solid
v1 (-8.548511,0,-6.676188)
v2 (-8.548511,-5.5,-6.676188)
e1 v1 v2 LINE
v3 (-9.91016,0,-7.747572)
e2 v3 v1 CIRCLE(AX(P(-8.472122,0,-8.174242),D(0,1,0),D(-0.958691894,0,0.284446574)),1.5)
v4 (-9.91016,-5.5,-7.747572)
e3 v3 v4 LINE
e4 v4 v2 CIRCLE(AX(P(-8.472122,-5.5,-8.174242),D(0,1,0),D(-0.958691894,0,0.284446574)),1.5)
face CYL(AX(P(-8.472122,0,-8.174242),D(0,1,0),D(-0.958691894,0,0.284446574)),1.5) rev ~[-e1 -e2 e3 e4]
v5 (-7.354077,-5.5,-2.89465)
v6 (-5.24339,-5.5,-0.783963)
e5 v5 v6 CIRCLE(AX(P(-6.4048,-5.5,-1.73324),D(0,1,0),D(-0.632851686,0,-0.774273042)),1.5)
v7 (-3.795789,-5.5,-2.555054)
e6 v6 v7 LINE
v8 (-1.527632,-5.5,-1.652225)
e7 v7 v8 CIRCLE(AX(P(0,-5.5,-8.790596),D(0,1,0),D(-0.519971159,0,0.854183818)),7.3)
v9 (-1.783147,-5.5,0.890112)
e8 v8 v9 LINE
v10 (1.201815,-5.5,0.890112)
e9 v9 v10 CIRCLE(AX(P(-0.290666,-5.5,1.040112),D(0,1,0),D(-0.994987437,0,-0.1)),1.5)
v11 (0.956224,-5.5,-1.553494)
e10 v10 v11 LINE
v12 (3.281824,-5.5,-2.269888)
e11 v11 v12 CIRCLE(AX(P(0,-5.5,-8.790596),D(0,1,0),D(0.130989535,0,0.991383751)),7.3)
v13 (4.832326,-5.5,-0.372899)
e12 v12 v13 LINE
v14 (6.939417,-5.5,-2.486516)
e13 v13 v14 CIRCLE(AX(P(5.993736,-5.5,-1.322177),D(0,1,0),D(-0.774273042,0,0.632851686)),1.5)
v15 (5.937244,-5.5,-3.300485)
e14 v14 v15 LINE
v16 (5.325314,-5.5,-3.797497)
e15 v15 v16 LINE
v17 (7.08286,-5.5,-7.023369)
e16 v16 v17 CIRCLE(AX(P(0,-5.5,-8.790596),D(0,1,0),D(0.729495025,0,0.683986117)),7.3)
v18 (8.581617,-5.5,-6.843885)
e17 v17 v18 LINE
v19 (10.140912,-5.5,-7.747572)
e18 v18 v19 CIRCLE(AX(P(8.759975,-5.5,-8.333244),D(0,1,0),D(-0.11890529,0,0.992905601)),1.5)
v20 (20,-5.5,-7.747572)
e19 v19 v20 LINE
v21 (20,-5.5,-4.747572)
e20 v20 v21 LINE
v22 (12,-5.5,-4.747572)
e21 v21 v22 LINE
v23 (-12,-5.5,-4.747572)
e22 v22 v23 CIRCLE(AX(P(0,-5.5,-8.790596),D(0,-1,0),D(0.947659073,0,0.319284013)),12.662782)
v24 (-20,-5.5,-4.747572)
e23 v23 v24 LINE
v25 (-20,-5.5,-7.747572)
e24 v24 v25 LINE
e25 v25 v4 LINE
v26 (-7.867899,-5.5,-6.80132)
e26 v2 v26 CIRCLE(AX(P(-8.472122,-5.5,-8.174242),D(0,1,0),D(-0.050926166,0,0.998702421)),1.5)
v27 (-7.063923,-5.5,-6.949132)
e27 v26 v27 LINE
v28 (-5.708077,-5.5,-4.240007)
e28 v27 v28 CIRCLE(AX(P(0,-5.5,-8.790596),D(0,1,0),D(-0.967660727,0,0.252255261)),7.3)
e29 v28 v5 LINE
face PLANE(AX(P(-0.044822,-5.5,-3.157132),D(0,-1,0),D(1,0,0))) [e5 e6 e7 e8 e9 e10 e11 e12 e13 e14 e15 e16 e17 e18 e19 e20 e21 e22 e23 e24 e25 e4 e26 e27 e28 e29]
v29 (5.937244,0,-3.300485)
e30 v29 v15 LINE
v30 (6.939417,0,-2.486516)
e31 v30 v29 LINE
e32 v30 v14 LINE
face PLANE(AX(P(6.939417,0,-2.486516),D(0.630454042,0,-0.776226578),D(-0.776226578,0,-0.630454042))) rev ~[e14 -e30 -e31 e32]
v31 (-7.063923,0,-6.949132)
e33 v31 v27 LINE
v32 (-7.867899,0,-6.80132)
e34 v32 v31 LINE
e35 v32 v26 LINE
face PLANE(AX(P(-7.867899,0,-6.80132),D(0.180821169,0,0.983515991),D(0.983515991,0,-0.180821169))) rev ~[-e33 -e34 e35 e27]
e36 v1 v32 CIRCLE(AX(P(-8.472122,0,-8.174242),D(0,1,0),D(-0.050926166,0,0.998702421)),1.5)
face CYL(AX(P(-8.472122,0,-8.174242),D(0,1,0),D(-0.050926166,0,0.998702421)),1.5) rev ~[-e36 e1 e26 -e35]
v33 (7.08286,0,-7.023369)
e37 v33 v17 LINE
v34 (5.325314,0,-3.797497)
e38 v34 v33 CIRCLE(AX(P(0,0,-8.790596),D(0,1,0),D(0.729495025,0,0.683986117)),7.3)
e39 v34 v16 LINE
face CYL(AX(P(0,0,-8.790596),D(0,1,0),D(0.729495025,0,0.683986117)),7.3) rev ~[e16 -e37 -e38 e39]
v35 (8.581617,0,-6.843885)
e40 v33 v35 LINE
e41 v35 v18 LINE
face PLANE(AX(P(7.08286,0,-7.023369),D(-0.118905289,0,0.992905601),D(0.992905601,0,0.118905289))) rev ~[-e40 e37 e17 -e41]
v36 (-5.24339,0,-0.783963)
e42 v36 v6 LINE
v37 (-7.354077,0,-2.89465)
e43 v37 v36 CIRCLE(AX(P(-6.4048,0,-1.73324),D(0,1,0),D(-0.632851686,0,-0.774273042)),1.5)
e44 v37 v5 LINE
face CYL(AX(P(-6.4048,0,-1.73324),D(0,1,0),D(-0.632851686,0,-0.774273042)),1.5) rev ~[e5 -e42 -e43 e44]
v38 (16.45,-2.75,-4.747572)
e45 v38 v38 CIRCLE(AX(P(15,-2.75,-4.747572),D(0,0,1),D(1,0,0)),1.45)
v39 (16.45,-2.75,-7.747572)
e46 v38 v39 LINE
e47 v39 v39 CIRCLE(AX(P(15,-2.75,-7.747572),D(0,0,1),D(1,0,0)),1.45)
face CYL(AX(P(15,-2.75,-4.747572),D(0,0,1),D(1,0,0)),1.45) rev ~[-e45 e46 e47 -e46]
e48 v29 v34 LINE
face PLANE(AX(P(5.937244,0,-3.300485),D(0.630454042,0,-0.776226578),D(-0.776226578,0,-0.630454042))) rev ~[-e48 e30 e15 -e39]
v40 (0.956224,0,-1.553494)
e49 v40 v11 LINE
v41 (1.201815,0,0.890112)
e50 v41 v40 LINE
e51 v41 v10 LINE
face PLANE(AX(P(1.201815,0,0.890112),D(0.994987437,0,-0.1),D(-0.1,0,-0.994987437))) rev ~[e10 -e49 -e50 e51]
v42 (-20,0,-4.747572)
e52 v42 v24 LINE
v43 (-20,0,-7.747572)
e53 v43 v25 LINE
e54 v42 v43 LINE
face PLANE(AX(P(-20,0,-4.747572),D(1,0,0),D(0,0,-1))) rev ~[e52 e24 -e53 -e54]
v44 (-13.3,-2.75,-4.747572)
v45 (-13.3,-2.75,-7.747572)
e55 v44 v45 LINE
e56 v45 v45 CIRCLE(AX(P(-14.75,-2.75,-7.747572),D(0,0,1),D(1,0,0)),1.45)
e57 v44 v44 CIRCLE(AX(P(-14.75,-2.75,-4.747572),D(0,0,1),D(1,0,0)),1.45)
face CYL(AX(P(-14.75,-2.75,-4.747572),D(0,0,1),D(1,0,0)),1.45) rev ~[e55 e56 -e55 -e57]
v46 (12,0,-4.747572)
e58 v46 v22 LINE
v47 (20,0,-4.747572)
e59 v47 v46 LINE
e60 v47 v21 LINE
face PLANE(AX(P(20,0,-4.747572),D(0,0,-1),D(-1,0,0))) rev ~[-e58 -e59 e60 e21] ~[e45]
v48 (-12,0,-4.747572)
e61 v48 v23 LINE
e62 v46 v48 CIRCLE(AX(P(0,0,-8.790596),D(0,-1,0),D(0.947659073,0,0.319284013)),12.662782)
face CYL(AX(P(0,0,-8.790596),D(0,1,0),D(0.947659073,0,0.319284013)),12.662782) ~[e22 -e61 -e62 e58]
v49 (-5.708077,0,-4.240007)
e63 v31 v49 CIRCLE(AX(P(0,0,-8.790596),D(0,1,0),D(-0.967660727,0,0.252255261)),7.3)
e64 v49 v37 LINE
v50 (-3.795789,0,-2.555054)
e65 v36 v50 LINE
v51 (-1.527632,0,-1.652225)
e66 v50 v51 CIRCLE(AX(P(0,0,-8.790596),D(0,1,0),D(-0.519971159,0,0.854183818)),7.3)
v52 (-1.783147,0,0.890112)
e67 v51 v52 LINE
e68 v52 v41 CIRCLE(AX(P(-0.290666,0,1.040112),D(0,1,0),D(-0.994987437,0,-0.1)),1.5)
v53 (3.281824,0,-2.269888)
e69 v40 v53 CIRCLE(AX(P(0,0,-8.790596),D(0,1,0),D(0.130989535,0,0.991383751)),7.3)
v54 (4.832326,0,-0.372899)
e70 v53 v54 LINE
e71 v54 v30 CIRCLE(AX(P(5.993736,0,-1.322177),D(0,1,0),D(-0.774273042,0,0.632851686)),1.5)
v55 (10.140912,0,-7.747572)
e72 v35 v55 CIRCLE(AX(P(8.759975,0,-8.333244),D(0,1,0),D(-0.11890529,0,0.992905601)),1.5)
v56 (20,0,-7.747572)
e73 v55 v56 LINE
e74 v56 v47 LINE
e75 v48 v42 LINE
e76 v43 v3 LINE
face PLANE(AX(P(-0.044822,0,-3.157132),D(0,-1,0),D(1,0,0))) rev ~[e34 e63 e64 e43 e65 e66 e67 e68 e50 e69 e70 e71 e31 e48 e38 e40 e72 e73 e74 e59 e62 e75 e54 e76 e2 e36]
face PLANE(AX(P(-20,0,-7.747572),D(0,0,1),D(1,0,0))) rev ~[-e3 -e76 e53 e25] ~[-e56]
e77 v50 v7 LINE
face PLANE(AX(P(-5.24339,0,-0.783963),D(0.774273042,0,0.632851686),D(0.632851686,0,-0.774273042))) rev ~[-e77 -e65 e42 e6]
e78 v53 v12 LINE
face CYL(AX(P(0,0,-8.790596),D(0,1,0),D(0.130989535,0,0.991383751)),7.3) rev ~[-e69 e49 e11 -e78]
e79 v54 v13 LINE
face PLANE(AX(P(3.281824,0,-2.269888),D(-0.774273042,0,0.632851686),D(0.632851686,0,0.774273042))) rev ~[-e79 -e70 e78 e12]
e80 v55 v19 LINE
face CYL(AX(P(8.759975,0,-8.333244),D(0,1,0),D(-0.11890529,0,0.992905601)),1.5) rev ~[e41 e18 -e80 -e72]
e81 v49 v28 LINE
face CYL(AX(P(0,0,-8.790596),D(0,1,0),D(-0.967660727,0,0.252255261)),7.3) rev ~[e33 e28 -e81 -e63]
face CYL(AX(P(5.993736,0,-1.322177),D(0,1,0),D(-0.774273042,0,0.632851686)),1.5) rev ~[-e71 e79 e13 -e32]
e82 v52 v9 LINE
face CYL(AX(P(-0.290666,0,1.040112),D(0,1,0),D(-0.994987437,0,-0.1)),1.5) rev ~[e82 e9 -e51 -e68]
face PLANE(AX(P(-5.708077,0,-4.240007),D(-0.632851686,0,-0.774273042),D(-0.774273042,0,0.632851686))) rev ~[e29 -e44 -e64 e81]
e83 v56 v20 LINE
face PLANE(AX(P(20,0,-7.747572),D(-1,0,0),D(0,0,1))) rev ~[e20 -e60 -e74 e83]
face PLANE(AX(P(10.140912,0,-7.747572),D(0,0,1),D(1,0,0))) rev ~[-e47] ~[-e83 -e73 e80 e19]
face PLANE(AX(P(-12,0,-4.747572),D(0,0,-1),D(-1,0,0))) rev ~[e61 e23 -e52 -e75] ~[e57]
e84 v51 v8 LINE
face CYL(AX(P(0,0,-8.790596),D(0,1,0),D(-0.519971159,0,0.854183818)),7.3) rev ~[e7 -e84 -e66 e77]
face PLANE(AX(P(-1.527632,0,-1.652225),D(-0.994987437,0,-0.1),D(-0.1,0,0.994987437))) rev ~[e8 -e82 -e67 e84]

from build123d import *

# Parameters (mm, degrees)
F1_DEPTH = 5.5
F2_R     = 1.45
F3_DEPTH = 25
F4_R     = 1.45
F5_DEPTH = 25


# Not quite as in the source:
# - a feature names something its author has since deleted; it is built from what else it names


with BuildPart() as f1:
    # F0 (on Front) → F1 (new body)
    with BuildSketch(Plane.XZ):
        with BuildLine():
            Line((10.1409122915, -7.7475719752), (20, -7.7475719752))
            Line((20, -7.7475719752), (20, -4.7475719752))
            Line((20, -4.7475719752), (12, -4.7475719752))
            ThreePointArc((12, -4.7475719752), (0, 3.8721859892), (-12, -4.7475719752))
            Line((-12, -4.7475719752), (-20, -4.7475719752))
            Line((-20, -4.7475719752), (-20, -7.7475719752))
            Line((-20, -7.7475719752), (-10, -7.7475719752))
            Line((-10, -7.7475719752), (-9.9101597832, -7.7475719752))
            ThreePointArc((-9.9101597832, -7.7475719752), (-9.399666092, -6.9954026392), (-8.5485111922, -6.6761882044))
            ThreePointArc((-8.5485111922, -6.6761882044), (-8.20089019, -6.698967849), (-7.8678987383, -6.8013200176))
            Line((-7.8678987383, -6.8013200176), (-7.0639233089, -6.9491323338))
            ThreePointArc((-7.0639233089, -6.9491323338), (-6.5280807154, -5.5234621099), (-5.7080769948, -4.2400070969))
            Line((-5.7080769948, -4.2400070969), (-7.3540770708, -2.8946497535))
            ThreePointArc((-7.3540770708, -2.8946497535), (-7.4654597138, -0.6725800185), (-5.2433899789, -0.7839626615))
            Line((-5.2433899789, -0.7839626615), (-3.7957894574, -2.5550538739))
            ThreePointArc((-3.7957894574, -2.5550538739), (-2.6997185699, -2.0081537307), (-1.5276324855, -1.6522248506))
            Line((-1.5276324855, -1.6522248506), (-1.7831469906, 0.8901123752))
            ThreePointArc((-1.7831469906, 0.8901123752), (-0.2906658349, 2.5401123752), (1.2018153207, 0.8901123752))
            Line((1.2018153207, 0.8901123752), (0.9562236033, -1.55349436))
            ThreePointArc((0.9562236033, -1.55349436), (2.1490849475, -1.8141042253), (3.281823707, -2.2698877168))
            Line((3.281823707, -2.2698877168), (4.832326413, -0.3728990956))
            ThreePointArc((4.832326413, -0.3728990956), (7.0560350494, -0.2631578905), (6.9394170389, -2.4865164921))
            Line((6.9394170389, -2.4865164921), (5.9372443956, -3.3004847472))
            Line((5.9372443956, -3.3004847472), (5.3253136848, -3.7974970895))
            ThreePointArc((5.3253136848, -3.7974970895), (6.4103242472, -5.2980690002), (7.0828602188, -7.0233687847))
            Line((7.0828602188, -7.0233687847), (8.5816167977, -6.8438853729))
            ThreePointArc((8.5816167977, -6.8438853729), (9.5121128892, -7.0354424826), (10.1409122915, -7.7475719752))
        make_face()
    extrude(amount=F1_DEPTH)

    # F2 (on face) → F3 (cut)
    with BuildSketch(Plane.XY.offset(-4.7475719752)):
        with Locations((-14.75, -2.75)):
            Circle(F2_R)
    extrude(amount=-F3_DEPTH, mode=Mode.SUBTRACT)

    # F4 (on face) → F5 (cut)
    with BuildSketch(Plane.XY.offset(-4.7475719752)):
        with Locations((15, -2.75)):
            Circle(F4_R)
    extrude(amount=-F5_DEPTH, mode=Mode.SUBTRACT)


solid = f1.part
